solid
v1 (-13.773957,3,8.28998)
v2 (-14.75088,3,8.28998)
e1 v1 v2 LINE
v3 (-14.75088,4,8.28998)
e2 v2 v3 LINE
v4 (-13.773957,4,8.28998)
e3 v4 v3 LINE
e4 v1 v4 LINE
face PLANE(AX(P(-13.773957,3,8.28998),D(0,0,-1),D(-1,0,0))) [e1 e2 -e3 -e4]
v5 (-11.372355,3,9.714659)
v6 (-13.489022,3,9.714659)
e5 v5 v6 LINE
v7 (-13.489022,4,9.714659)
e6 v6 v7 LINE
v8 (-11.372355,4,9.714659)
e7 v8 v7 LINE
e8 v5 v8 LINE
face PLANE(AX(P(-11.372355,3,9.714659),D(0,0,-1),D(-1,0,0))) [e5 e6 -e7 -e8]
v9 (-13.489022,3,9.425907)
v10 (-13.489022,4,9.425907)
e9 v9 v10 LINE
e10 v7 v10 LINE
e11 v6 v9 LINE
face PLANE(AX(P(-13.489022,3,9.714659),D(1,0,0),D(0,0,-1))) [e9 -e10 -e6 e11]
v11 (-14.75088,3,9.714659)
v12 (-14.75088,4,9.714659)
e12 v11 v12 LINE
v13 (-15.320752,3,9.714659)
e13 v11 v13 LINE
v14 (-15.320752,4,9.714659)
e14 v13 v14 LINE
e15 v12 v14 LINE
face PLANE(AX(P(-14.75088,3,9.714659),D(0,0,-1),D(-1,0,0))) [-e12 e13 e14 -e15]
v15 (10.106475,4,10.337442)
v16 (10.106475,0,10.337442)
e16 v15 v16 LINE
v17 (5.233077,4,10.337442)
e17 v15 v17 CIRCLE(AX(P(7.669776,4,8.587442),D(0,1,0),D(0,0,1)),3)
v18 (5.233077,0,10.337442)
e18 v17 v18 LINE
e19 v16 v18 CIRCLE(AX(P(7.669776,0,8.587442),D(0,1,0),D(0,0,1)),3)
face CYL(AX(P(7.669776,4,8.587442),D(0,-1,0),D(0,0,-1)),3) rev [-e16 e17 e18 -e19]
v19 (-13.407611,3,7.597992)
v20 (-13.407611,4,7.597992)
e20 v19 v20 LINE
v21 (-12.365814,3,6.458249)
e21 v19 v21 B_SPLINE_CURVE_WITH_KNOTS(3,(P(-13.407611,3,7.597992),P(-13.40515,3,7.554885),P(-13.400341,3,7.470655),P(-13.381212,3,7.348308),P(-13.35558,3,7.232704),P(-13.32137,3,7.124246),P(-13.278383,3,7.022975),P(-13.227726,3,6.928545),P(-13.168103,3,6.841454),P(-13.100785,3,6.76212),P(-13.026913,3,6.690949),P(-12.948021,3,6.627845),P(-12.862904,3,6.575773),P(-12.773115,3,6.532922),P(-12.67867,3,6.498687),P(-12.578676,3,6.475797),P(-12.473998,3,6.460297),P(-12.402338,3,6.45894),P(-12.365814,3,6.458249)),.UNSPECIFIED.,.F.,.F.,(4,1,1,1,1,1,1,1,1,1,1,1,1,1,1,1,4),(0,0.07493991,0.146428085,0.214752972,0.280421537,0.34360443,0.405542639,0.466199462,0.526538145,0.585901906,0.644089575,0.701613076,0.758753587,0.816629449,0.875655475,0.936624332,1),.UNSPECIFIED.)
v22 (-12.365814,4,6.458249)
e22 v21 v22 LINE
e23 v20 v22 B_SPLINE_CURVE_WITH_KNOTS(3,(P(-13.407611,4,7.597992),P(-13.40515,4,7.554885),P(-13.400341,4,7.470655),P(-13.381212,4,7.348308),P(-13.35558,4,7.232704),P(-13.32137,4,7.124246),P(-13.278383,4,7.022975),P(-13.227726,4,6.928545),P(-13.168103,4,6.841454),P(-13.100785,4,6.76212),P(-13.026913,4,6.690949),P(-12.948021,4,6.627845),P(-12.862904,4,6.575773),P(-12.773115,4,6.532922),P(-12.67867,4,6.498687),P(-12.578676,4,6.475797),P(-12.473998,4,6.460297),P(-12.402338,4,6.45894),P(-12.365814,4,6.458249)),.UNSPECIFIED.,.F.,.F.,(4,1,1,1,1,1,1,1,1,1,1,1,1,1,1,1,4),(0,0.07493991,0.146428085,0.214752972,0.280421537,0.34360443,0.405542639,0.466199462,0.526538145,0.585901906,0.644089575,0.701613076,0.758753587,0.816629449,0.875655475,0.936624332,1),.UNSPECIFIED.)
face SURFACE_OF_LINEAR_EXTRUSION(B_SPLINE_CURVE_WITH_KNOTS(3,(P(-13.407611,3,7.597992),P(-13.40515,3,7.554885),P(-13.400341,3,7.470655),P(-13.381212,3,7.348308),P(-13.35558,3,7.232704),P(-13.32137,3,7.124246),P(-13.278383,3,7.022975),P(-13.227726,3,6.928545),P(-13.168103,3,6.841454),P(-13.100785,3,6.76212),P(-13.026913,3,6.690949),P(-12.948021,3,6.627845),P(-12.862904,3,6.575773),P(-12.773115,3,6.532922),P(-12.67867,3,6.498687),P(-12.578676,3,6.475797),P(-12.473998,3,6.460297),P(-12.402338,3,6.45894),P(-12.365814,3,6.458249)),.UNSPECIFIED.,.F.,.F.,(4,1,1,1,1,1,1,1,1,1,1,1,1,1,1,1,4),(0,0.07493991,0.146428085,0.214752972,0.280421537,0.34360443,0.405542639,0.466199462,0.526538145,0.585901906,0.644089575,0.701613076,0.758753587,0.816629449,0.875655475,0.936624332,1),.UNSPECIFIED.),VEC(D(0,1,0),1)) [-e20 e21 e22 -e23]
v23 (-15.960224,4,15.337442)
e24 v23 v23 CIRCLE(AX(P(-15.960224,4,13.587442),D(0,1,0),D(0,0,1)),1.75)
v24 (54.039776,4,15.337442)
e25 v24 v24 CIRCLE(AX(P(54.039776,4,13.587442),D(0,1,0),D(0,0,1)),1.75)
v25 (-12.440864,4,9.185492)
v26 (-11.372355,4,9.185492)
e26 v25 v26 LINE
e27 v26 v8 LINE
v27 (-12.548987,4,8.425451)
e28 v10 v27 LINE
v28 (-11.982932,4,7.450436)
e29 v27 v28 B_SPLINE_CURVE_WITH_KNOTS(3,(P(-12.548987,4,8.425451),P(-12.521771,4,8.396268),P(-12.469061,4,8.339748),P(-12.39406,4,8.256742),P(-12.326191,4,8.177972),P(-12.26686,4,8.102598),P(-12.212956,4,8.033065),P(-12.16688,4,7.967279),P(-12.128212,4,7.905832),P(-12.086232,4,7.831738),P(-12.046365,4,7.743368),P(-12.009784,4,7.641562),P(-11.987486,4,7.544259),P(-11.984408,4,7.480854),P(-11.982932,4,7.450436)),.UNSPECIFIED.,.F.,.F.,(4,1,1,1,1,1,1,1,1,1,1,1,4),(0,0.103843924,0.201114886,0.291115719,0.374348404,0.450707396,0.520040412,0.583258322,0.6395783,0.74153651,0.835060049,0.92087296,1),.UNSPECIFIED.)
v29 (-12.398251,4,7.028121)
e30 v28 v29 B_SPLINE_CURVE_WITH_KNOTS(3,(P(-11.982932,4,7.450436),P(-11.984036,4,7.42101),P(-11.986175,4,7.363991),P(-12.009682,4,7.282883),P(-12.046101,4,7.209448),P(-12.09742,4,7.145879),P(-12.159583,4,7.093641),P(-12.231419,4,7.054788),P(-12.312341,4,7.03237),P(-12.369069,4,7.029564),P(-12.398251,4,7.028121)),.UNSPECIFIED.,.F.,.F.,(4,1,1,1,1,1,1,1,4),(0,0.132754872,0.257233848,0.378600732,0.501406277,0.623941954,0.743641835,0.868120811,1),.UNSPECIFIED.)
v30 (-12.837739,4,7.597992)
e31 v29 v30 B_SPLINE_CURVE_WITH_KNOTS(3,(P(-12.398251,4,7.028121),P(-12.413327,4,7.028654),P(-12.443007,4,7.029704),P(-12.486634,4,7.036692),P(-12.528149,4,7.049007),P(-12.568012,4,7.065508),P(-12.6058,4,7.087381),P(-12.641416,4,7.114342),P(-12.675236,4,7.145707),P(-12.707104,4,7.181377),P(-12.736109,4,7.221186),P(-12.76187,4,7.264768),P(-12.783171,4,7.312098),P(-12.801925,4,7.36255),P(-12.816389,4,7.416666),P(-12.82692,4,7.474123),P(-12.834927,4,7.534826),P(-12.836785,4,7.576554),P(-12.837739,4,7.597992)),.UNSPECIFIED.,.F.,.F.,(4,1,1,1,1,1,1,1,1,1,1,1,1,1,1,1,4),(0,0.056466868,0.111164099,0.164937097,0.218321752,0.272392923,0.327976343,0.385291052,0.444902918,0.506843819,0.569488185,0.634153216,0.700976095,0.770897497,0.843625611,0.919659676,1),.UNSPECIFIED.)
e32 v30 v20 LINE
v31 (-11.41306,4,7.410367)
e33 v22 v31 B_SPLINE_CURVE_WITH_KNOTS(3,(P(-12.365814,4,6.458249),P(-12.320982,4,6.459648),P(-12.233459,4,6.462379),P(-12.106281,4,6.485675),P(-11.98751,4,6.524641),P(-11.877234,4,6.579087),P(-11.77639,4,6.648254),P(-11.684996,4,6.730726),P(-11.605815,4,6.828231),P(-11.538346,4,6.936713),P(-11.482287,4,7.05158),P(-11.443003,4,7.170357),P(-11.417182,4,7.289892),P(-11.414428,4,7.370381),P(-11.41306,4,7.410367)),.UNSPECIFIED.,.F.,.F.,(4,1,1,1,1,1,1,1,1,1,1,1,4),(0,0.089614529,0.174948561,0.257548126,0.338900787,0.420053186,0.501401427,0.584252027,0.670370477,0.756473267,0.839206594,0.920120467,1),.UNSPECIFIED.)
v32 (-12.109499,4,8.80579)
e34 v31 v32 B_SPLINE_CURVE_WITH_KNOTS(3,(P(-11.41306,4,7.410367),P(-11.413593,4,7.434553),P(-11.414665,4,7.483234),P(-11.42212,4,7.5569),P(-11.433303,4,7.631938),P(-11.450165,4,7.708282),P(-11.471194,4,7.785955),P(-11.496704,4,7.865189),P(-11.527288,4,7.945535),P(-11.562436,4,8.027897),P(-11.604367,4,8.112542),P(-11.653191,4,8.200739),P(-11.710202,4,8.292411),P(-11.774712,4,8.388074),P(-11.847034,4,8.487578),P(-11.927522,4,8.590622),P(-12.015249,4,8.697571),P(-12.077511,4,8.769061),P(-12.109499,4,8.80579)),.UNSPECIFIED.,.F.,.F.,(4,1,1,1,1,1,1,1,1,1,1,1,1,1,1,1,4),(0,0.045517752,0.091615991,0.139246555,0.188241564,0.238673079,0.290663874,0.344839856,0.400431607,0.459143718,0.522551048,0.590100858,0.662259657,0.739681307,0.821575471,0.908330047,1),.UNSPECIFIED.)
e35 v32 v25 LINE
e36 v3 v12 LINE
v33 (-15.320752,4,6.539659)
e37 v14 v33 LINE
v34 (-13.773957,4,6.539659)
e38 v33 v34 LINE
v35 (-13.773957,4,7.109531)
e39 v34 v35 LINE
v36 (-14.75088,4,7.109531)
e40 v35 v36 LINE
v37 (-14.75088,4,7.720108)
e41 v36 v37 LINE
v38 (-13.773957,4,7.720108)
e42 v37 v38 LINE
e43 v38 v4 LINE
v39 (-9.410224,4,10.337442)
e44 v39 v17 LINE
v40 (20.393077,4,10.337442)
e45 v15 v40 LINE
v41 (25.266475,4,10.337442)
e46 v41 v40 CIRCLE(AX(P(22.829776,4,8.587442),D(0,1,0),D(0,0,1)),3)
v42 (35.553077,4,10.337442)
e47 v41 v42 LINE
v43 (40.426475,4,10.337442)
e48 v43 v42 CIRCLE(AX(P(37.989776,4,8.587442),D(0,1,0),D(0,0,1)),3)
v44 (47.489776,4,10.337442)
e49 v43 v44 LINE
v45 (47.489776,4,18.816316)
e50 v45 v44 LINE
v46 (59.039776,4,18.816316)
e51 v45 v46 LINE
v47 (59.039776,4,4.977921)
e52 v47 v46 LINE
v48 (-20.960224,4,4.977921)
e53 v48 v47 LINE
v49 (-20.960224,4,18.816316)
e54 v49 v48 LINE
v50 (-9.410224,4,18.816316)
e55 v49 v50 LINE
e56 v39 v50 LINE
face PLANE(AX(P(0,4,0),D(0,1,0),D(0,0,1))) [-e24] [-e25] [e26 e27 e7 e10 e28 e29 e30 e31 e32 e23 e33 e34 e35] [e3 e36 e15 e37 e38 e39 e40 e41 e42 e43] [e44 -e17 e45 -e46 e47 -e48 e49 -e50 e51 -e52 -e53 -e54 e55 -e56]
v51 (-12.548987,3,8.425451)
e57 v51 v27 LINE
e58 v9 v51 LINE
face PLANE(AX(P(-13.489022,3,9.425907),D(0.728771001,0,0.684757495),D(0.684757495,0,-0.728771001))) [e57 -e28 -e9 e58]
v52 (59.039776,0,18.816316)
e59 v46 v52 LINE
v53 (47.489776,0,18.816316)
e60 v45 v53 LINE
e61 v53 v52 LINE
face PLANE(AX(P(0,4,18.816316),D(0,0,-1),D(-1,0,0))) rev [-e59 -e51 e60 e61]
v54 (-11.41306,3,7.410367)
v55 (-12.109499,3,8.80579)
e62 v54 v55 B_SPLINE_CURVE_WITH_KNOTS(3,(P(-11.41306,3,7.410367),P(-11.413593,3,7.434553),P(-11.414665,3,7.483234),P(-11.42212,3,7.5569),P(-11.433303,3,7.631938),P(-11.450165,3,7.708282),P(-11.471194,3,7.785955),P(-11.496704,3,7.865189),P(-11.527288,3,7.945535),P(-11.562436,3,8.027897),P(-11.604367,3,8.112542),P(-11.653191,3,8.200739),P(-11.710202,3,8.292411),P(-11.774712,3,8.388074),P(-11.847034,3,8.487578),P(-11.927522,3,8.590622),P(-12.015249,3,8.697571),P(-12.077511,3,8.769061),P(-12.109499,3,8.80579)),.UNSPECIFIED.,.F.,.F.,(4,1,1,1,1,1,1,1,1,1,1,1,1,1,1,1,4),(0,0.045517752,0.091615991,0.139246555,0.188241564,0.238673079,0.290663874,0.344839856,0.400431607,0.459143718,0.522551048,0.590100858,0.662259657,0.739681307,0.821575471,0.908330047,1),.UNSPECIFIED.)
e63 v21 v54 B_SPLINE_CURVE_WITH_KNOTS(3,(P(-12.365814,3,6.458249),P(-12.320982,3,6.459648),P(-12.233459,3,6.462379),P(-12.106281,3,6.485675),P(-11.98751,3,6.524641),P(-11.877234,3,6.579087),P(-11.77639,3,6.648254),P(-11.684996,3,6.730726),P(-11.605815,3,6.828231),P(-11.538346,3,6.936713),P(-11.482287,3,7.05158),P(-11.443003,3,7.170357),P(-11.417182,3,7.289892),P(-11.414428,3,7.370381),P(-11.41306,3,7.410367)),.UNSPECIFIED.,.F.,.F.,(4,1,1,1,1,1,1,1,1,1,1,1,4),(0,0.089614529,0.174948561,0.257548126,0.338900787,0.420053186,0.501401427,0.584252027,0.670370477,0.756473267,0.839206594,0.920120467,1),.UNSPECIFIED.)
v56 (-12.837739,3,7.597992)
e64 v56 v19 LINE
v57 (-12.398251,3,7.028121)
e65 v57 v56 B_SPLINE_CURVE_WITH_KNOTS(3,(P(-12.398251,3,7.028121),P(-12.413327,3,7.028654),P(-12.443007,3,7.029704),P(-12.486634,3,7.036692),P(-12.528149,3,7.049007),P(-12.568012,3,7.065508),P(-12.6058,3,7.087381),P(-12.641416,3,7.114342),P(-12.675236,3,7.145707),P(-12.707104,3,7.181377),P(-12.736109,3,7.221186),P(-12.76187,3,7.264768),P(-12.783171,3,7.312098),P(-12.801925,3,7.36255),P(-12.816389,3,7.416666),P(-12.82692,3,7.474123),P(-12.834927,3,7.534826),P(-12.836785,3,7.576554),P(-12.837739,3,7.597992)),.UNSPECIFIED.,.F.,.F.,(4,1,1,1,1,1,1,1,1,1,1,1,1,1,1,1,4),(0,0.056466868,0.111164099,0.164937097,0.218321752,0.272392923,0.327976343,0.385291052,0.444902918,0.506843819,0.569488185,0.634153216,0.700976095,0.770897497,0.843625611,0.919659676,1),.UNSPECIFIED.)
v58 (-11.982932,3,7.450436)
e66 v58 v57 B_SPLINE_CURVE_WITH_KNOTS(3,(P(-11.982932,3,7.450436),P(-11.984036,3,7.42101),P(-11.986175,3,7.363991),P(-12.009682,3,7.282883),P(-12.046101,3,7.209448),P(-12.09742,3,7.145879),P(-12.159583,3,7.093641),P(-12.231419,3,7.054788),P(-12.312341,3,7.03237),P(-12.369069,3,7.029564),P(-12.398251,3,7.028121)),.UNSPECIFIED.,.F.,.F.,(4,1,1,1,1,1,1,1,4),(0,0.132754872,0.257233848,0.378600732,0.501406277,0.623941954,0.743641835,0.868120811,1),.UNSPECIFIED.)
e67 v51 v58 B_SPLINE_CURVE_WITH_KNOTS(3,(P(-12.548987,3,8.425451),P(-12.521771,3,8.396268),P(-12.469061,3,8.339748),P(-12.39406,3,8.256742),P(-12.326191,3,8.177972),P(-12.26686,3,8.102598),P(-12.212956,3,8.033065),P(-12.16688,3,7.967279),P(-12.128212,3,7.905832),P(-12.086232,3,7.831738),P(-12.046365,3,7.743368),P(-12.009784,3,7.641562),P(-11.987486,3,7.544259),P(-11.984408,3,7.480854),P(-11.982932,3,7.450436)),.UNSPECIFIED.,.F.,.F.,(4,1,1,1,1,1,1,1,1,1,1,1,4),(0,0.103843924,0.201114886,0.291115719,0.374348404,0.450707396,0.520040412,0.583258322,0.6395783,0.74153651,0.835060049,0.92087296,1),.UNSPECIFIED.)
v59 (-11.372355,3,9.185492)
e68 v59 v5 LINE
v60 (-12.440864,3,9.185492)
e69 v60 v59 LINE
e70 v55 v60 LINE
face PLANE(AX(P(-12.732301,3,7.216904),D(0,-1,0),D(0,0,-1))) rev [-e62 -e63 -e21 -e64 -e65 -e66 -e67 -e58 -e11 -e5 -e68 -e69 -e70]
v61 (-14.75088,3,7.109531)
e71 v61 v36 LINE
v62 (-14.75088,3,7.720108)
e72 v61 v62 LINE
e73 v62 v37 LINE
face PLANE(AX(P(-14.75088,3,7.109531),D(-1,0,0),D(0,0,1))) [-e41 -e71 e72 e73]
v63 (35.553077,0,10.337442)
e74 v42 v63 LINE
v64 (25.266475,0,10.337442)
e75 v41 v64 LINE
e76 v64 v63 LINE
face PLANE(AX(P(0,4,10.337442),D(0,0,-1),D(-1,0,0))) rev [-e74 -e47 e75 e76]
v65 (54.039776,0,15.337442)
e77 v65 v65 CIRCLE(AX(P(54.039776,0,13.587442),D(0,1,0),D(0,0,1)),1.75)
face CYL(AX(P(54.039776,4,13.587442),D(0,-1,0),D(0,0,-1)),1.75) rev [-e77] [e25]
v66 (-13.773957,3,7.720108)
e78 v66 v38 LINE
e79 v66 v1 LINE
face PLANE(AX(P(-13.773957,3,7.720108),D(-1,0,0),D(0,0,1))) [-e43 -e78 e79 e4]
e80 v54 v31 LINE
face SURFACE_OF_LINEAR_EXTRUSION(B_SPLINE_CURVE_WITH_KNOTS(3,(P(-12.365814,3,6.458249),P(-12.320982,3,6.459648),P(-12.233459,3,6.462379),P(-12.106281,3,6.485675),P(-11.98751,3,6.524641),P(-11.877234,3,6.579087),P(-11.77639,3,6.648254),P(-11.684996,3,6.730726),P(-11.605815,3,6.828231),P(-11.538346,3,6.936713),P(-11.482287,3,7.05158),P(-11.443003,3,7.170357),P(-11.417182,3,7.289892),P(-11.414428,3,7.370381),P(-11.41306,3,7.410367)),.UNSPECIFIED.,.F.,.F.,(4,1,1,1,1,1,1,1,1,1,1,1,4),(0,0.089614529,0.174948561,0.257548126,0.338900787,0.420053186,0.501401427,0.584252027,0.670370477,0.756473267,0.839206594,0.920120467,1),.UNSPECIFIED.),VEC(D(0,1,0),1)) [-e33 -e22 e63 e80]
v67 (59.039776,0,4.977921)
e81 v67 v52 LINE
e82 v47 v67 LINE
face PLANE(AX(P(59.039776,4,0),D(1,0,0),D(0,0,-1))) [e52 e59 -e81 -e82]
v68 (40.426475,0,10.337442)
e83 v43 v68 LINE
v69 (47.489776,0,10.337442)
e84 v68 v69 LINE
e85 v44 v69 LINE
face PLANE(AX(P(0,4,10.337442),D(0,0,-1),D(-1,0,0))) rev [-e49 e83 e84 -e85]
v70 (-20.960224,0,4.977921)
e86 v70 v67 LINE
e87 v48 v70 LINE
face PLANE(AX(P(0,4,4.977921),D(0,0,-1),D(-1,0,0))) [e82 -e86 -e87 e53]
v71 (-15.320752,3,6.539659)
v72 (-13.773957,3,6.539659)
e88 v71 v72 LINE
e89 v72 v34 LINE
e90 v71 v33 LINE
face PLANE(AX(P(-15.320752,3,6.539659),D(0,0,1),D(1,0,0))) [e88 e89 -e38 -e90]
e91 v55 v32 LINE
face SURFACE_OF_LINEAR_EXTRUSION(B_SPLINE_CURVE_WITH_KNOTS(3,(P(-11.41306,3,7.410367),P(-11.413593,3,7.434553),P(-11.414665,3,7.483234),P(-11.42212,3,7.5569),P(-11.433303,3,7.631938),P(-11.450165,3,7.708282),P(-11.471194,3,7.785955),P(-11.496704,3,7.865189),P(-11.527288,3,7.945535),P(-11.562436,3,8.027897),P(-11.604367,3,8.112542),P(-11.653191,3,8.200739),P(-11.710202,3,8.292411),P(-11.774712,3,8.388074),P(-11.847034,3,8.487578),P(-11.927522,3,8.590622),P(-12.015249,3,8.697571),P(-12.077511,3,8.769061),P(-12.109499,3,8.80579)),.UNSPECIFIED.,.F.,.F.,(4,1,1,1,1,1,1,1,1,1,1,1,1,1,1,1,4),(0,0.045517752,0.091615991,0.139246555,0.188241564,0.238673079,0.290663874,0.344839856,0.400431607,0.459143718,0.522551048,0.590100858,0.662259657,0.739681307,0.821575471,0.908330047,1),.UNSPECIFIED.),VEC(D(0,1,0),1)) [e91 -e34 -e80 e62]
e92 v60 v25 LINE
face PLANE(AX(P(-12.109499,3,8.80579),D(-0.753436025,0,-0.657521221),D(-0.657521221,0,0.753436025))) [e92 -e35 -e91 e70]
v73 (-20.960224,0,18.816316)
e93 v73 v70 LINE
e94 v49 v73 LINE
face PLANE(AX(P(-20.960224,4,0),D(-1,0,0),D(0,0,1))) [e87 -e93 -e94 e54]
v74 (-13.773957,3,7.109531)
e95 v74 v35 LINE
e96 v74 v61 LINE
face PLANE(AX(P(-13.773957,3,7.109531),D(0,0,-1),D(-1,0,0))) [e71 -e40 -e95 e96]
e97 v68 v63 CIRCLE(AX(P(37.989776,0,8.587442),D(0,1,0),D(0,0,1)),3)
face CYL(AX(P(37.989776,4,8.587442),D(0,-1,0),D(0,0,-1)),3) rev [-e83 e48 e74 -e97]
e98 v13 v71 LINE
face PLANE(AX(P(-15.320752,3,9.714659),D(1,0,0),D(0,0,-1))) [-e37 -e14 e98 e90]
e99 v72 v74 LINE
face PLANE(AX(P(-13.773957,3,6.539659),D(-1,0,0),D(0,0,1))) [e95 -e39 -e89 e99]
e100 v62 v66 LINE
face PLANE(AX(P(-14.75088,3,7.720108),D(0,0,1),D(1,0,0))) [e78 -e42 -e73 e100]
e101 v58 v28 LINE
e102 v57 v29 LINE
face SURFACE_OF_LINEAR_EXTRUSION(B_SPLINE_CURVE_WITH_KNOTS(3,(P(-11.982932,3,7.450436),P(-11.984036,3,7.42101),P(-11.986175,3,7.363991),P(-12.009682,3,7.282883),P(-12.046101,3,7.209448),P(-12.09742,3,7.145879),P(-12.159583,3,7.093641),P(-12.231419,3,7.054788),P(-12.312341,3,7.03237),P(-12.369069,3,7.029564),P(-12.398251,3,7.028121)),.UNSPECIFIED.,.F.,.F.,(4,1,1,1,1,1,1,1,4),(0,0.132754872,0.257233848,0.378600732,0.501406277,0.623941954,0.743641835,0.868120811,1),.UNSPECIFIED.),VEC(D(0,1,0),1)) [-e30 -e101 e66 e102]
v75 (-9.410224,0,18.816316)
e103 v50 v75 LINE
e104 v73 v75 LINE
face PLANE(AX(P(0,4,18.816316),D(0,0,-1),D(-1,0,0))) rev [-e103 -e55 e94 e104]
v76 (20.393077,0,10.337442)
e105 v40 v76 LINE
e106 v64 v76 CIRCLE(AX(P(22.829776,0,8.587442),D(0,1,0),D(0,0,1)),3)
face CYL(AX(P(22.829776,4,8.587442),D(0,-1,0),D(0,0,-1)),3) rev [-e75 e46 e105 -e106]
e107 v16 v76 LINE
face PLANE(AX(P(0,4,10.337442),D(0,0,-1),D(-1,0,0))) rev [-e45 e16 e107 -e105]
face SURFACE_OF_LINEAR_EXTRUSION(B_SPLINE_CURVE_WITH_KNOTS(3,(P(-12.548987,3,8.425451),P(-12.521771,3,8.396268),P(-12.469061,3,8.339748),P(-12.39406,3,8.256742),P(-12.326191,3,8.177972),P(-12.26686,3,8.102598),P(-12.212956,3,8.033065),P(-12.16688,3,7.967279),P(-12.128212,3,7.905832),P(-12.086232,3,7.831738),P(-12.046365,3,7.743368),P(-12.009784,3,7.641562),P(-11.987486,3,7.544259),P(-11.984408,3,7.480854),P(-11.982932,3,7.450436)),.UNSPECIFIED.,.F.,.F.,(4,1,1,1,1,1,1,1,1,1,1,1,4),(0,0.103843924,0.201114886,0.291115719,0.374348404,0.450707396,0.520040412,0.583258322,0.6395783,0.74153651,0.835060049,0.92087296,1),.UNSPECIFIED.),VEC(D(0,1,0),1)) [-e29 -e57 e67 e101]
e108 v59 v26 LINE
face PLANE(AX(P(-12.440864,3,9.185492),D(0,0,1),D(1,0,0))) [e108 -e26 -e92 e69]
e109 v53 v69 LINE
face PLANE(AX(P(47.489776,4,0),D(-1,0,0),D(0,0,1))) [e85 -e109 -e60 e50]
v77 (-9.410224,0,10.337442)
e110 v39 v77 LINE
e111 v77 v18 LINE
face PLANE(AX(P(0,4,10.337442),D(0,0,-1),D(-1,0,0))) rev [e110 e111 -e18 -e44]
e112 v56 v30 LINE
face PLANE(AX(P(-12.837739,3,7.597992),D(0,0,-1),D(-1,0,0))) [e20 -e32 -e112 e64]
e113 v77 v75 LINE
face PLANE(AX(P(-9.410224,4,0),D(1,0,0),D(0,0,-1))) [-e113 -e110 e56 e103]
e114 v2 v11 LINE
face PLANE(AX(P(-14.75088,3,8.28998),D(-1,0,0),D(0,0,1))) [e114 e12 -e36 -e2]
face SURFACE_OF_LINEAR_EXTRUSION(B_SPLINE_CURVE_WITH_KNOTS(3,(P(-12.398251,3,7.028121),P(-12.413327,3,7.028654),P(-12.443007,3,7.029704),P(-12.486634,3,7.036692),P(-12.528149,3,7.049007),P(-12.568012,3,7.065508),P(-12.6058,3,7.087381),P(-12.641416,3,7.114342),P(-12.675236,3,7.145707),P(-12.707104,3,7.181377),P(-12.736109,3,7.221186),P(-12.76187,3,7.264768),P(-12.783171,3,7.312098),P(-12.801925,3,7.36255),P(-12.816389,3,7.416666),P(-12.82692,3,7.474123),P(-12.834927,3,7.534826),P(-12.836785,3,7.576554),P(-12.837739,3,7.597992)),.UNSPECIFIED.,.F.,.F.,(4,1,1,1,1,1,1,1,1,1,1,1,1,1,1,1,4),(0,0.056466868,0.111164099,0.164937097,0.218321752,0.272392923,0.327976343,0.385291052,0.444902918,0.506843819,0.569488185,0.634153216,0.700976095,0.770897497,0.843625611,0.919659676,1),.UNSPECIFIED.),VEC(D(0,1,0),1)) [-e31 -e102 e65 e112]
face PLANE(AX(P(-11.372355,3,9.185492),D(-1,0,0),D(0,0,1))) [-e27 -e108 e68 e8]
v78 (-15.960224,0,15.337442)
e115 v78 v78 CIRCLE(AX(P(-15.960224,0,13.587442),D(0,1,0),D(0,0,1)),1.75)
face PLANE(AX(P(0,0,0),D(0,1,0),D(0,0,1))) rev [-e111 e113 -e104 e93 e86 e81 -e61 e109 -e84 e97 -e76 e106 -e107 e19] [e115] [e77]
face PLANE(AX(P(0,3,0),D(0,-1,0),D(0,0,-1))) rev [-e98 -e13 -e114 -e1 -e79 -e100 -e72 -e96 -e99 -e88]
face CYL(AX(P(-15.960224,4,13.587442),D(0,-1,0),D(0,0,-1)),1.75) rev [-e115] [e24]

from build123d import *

# Parameters (mm, degrees)
SKETCH1_R           = 1.75
BOSS_EXTRUDE1_DEPTH = 4
CUT_EXTRUDE1_DEPTH  = 1


with BuildPart() as part:
    # Sketch1 → Boss-Extrude1 (new body)
    with BuildSketch(Plane(origin=(0, 0, 0), x_dir=(1, 0, 0), z_dir=(0, 1, 0))):
        with BuildLine():
            Line((-20.960223818, -18.816315938), (-9.410223818, -18.816315938))
            Line((-9.410223818, -18.816315938), (-9.410223818, -10.337442774))
            Line((-9.410223818, -10.337442774), (5.233077589, -10.337442316))
            ThreePointArc((5.233077589, -10.337442316), (7.669776044, -5.587442326), (10.106474937, -10.337442092))
            Line((10.106474937, -10.337442092), (20.393077428, -10.337442092))
            ThreePointArc((20.393077428, -10.337442092), (22.829776182, -5.587442326), (25.266474937, -10.337442092))
            Line((25.266474937, -10.337442092), (35.553077428, -10.337442092))
            ThreePointArc((35.553077428, -10.337442092), (37.989776038, -5.587442326), (40.426475105, -10.337441858))
            Line((40.426475105, -10.337441858), (47.489776182, -10.337441858))
            Line((47.489776182, -10.337441858), (47.489776182, -18.816315938))
            Line((47.489776182, -18.816315938), (59.039776182, -18.816315938))
            Line((59.039776182, -18.816315938), (59.039776182, -4.977921029))
            Line((59.039776182, -4.977921029), (-20.960223818, -4.977921029))
            Line((-20.960223818, -4.977921029), (-20.960223818, -18.816315938))
        make_face()
        with Locations((-15.960223818, -13.587442209)):
            Circle(SKETCH1_R, mode=Mode.SUBTRACT)
        with Locations((54.039776182, -13.587442209)):
            Circle(SKETCH1_R, mode=Mode.SUBTRACT)
    extrude(amount=BOSS_EXTRUDE1_DEPTH)

    # Sketch2 → Cut-Extrude1 (cut)
    with BuildSketch(Plane(origin=(0, 4, 0), x_dir=(1, 0, 0), z_dir=(0, 1, 0))):
        Polygon((-15.320752279, -6.539659084), (-13.773957408, -6.539659084), (-13.773957408, -7.109530878), (-14.750880484, -7.109530878), (-14.750880484, -7.720107802), (-13.773957408, -7.720107802), (-13.773957408, -8.289979596), (-14.750880484, -8.289979596), (-14.750880484, -9.714659084), (-15.320752279, -9.714659084), align=None)
        with BuildLine():
            Line((-12.837739459, -7.597992417), (-13.407611254, -7.597992417))
            add(Edge.make_bspline(
                [(-13.407611254, -7.597992417), (-13.405150065, -7.554884631), (-13.40034105, -7.470654604), (-13.381212002, -7.348307794), (-13.355579735, -7.232703511), (-13.321370072, -7.124246154), (-13.278383392, -7.022975131), (-13.227725853, -6.928545205), (-13.16810327, -6.84145355), (-13.100784607, -6.762120173), (-13.026912751, -6.690949467), (-12.948021354, -6.627845049), (-12.862903665, -6.575772871), (-12.773114854, -6.53292229), (-12.678670211, -6.498686666), (-12.57867614, -6.475797382), (-12.473998445, -6.460296534), (-12.402338086, -6.458940148), (-12.365814379, -6.458248827)],
                knots=[0, 0, 0, 0, 1.199038563, 2.342849363, 3.436047546, 4.486744587, 5.497670872, 6.488682221, 7.459191391, 8.424610317, 9.374430501, 10.305433194, 11.225809216, 12.140057399, 13.06607119, 14.010487599, 14.985989317, 16, 16, 16, 16], degree=3))
            add(Edge.make_bspline(
                [(-12.365814379, -6.458248827), (-12.320982046, -6.459647714), (-12.233458825, -6.462378669), (-12.106280643, -6.485674624), (-11.987510127, -6.524640707), (-11.877233611, -6.579086602), (-11.776389898, -6.648254404), (-11.684995712, -6.730725688), (-11.605814958, -6.828230745), (-11.538345606, -6.936712548), (-11.482286639, -7.05157951), (-11.44300285, -7.170356712), (-11.417182038, -7.289892289), (-11.414428089, -7.370381495), (-11.413059972, -7.410367217)],
                knots=[0, 0, 0, 0, 1.075374347, 2.099382735, 3.09057751, 4.06680945, 5.040638231, 6.016817125, 7.011024321, 8.044445721, 9.0776792, 10.070479129, 11.0414456, 12, 12, 12, 12], degree=3))
            add(Edge.make_bspline(
                [(-11.413059972, -7.410367217), (-11.413592644, -7.434553407), (-11.414664782, -7.483234233), (-11.422119502, -7.556900272), (-11.433303054, -7.631937745), (-11.450165124, -7.708282315), (-11.471193509, -7.785955382), (-11.496703979, -7.865189395), (-11.527288275, -7.945535126), (-11.562436007, -8.027896853), (-11.604367341, -8.112541972), (-11.65319055, -8.200739347), (-11.710201514, -8.292410738), (-11.774711612, -8.388073754), (-11.847034153, -8.487577518), (-11.927522194, -8.590622294), (-12.0152487, -8.697571179), (-12.077510669, -8.769060507), (-12.109499275, -8.805789893)],
                knots=[0, 0, 0, 0, 0.728284026, 1.46585585, 2.227944881, 3.01186502, 3.81876927, 4.650621989, 5.517437689, 6.406905708, 7.346299482, 8.360816762, 9.441613733, 10.596154504, 11.834900912, 13.145207542, 14.533280747, 16, 16, 16, 16], degree=3))
            Line((-12.109499275, -8.805789893), (-12.440864459, -9.185492417))
            Line((-12.440864459, -9.185492417), (-11.372354843, -9.185492417))
            Line((-11.372354843, -9.185492417), (-11.372354843, -9.714659084))
            Line((-11.372354843, -9.714659084), (-13.48902151, -9.714659084))
            Line((-13.48902151, -9.714659084), (-13.48902151, -9.42590708))
            Line((-13.48902151, -9.42590708), (-12.548987456, -8.425451351))
            add(Edge.make_bspline(
                [(-12.548987456, -8.425451351), (-12.521771054, -8.396267747), (-12.469060955, -8.33974776), (-12.394059917, -8.256742146), (-12.326190603, -8.1779718), (-12.266860337, -8.102597976), (-12.212955546, -8.033065495), (-12.166879838, -7.96727856), (-12.128211657, -7.905831909), (-12.086231862, -7.83173798), (-12.046364857, -7.743367785), (-12.009784466, -7.641561697), (-11.987486187, -7.544258523), (-11.984408319, -7.480853684), (-11.982931767, -7.450436327)],
                knots=[0, 0, 0, 0, 1.246127091, 2.413378631, 3.493388633, 4.492180848, 5.408488754, 6.240484944, 6.999099869, 7.674939598, 8.898438119, 10.020720584, 11.050475521, 12, 12, 12, 12], degree=3))
            add(Edge.make_bspline(
                [(-11.982931767, -7.450436327), (-11.984035749, -7.421009882), (-11.986174893, -7.363991425), (-12.009682351, -7.282882975), (-12.046100921, -7.209447553), (-12.097419828, -7.145879492), (-12.159583098, -7.093641402), (-12.231418596, -7.054788177), (-12.312340651, -7.032370045), (-12.369068553, -7.029564096), (-12.398251278, -7.028120622)],
                knots=[0, 0, 0, 0, 1.062038974, 2.057870785, 3.028805853, 4.01125022, 4.991535629, 5.949134679, 6.94496649, 8, 8, 8, 8], degree=3))
            add(Edge.make_bspline(
                [(-12.398251278, -7.028120622), (-12.413327445, -7.028653859), (-12.443007301, -7.02970362), (-12.48663437, -7.0366916), (-12.528148661, -7.049007186), (-12.56801225, -7.065508337), (-12.605799703, -7.087380731), (-12.641415708, -7.114341941), (-12.675235525, -7.145706822), (-12.707104042, -7.1813773), (-12.736108553, -7.221185564), (-12.761870254, -7.264768046), (-12.783170892, -7.312097695), (-12.801924747, -7.362549685), (-12.816388618, -7.416665914), (-12.82692011, -7.4741225), (-12.834926501, -7.534825971), (-12.836784749, -7.576553899), (-12.837739459, -7.597992417)],
                knots=[0, 0, 0, 0, 0.903469896, 1.778625579, 2.63899355, 3.493148037, 4.358286772, 5.247621495, 6.164656832, 7.118446693, 8.109501108, 9.111810964, 10.146451449, 11.215617525, 12.33435995, 13.498009769, 14.714554818, 16, 16, 16, 16], degree=3))
        make_face()
    extrude(amount=-CUT_EXTRUDE1_DEPTH, mode=Mode.SUBTRACT)


solid = part.part
